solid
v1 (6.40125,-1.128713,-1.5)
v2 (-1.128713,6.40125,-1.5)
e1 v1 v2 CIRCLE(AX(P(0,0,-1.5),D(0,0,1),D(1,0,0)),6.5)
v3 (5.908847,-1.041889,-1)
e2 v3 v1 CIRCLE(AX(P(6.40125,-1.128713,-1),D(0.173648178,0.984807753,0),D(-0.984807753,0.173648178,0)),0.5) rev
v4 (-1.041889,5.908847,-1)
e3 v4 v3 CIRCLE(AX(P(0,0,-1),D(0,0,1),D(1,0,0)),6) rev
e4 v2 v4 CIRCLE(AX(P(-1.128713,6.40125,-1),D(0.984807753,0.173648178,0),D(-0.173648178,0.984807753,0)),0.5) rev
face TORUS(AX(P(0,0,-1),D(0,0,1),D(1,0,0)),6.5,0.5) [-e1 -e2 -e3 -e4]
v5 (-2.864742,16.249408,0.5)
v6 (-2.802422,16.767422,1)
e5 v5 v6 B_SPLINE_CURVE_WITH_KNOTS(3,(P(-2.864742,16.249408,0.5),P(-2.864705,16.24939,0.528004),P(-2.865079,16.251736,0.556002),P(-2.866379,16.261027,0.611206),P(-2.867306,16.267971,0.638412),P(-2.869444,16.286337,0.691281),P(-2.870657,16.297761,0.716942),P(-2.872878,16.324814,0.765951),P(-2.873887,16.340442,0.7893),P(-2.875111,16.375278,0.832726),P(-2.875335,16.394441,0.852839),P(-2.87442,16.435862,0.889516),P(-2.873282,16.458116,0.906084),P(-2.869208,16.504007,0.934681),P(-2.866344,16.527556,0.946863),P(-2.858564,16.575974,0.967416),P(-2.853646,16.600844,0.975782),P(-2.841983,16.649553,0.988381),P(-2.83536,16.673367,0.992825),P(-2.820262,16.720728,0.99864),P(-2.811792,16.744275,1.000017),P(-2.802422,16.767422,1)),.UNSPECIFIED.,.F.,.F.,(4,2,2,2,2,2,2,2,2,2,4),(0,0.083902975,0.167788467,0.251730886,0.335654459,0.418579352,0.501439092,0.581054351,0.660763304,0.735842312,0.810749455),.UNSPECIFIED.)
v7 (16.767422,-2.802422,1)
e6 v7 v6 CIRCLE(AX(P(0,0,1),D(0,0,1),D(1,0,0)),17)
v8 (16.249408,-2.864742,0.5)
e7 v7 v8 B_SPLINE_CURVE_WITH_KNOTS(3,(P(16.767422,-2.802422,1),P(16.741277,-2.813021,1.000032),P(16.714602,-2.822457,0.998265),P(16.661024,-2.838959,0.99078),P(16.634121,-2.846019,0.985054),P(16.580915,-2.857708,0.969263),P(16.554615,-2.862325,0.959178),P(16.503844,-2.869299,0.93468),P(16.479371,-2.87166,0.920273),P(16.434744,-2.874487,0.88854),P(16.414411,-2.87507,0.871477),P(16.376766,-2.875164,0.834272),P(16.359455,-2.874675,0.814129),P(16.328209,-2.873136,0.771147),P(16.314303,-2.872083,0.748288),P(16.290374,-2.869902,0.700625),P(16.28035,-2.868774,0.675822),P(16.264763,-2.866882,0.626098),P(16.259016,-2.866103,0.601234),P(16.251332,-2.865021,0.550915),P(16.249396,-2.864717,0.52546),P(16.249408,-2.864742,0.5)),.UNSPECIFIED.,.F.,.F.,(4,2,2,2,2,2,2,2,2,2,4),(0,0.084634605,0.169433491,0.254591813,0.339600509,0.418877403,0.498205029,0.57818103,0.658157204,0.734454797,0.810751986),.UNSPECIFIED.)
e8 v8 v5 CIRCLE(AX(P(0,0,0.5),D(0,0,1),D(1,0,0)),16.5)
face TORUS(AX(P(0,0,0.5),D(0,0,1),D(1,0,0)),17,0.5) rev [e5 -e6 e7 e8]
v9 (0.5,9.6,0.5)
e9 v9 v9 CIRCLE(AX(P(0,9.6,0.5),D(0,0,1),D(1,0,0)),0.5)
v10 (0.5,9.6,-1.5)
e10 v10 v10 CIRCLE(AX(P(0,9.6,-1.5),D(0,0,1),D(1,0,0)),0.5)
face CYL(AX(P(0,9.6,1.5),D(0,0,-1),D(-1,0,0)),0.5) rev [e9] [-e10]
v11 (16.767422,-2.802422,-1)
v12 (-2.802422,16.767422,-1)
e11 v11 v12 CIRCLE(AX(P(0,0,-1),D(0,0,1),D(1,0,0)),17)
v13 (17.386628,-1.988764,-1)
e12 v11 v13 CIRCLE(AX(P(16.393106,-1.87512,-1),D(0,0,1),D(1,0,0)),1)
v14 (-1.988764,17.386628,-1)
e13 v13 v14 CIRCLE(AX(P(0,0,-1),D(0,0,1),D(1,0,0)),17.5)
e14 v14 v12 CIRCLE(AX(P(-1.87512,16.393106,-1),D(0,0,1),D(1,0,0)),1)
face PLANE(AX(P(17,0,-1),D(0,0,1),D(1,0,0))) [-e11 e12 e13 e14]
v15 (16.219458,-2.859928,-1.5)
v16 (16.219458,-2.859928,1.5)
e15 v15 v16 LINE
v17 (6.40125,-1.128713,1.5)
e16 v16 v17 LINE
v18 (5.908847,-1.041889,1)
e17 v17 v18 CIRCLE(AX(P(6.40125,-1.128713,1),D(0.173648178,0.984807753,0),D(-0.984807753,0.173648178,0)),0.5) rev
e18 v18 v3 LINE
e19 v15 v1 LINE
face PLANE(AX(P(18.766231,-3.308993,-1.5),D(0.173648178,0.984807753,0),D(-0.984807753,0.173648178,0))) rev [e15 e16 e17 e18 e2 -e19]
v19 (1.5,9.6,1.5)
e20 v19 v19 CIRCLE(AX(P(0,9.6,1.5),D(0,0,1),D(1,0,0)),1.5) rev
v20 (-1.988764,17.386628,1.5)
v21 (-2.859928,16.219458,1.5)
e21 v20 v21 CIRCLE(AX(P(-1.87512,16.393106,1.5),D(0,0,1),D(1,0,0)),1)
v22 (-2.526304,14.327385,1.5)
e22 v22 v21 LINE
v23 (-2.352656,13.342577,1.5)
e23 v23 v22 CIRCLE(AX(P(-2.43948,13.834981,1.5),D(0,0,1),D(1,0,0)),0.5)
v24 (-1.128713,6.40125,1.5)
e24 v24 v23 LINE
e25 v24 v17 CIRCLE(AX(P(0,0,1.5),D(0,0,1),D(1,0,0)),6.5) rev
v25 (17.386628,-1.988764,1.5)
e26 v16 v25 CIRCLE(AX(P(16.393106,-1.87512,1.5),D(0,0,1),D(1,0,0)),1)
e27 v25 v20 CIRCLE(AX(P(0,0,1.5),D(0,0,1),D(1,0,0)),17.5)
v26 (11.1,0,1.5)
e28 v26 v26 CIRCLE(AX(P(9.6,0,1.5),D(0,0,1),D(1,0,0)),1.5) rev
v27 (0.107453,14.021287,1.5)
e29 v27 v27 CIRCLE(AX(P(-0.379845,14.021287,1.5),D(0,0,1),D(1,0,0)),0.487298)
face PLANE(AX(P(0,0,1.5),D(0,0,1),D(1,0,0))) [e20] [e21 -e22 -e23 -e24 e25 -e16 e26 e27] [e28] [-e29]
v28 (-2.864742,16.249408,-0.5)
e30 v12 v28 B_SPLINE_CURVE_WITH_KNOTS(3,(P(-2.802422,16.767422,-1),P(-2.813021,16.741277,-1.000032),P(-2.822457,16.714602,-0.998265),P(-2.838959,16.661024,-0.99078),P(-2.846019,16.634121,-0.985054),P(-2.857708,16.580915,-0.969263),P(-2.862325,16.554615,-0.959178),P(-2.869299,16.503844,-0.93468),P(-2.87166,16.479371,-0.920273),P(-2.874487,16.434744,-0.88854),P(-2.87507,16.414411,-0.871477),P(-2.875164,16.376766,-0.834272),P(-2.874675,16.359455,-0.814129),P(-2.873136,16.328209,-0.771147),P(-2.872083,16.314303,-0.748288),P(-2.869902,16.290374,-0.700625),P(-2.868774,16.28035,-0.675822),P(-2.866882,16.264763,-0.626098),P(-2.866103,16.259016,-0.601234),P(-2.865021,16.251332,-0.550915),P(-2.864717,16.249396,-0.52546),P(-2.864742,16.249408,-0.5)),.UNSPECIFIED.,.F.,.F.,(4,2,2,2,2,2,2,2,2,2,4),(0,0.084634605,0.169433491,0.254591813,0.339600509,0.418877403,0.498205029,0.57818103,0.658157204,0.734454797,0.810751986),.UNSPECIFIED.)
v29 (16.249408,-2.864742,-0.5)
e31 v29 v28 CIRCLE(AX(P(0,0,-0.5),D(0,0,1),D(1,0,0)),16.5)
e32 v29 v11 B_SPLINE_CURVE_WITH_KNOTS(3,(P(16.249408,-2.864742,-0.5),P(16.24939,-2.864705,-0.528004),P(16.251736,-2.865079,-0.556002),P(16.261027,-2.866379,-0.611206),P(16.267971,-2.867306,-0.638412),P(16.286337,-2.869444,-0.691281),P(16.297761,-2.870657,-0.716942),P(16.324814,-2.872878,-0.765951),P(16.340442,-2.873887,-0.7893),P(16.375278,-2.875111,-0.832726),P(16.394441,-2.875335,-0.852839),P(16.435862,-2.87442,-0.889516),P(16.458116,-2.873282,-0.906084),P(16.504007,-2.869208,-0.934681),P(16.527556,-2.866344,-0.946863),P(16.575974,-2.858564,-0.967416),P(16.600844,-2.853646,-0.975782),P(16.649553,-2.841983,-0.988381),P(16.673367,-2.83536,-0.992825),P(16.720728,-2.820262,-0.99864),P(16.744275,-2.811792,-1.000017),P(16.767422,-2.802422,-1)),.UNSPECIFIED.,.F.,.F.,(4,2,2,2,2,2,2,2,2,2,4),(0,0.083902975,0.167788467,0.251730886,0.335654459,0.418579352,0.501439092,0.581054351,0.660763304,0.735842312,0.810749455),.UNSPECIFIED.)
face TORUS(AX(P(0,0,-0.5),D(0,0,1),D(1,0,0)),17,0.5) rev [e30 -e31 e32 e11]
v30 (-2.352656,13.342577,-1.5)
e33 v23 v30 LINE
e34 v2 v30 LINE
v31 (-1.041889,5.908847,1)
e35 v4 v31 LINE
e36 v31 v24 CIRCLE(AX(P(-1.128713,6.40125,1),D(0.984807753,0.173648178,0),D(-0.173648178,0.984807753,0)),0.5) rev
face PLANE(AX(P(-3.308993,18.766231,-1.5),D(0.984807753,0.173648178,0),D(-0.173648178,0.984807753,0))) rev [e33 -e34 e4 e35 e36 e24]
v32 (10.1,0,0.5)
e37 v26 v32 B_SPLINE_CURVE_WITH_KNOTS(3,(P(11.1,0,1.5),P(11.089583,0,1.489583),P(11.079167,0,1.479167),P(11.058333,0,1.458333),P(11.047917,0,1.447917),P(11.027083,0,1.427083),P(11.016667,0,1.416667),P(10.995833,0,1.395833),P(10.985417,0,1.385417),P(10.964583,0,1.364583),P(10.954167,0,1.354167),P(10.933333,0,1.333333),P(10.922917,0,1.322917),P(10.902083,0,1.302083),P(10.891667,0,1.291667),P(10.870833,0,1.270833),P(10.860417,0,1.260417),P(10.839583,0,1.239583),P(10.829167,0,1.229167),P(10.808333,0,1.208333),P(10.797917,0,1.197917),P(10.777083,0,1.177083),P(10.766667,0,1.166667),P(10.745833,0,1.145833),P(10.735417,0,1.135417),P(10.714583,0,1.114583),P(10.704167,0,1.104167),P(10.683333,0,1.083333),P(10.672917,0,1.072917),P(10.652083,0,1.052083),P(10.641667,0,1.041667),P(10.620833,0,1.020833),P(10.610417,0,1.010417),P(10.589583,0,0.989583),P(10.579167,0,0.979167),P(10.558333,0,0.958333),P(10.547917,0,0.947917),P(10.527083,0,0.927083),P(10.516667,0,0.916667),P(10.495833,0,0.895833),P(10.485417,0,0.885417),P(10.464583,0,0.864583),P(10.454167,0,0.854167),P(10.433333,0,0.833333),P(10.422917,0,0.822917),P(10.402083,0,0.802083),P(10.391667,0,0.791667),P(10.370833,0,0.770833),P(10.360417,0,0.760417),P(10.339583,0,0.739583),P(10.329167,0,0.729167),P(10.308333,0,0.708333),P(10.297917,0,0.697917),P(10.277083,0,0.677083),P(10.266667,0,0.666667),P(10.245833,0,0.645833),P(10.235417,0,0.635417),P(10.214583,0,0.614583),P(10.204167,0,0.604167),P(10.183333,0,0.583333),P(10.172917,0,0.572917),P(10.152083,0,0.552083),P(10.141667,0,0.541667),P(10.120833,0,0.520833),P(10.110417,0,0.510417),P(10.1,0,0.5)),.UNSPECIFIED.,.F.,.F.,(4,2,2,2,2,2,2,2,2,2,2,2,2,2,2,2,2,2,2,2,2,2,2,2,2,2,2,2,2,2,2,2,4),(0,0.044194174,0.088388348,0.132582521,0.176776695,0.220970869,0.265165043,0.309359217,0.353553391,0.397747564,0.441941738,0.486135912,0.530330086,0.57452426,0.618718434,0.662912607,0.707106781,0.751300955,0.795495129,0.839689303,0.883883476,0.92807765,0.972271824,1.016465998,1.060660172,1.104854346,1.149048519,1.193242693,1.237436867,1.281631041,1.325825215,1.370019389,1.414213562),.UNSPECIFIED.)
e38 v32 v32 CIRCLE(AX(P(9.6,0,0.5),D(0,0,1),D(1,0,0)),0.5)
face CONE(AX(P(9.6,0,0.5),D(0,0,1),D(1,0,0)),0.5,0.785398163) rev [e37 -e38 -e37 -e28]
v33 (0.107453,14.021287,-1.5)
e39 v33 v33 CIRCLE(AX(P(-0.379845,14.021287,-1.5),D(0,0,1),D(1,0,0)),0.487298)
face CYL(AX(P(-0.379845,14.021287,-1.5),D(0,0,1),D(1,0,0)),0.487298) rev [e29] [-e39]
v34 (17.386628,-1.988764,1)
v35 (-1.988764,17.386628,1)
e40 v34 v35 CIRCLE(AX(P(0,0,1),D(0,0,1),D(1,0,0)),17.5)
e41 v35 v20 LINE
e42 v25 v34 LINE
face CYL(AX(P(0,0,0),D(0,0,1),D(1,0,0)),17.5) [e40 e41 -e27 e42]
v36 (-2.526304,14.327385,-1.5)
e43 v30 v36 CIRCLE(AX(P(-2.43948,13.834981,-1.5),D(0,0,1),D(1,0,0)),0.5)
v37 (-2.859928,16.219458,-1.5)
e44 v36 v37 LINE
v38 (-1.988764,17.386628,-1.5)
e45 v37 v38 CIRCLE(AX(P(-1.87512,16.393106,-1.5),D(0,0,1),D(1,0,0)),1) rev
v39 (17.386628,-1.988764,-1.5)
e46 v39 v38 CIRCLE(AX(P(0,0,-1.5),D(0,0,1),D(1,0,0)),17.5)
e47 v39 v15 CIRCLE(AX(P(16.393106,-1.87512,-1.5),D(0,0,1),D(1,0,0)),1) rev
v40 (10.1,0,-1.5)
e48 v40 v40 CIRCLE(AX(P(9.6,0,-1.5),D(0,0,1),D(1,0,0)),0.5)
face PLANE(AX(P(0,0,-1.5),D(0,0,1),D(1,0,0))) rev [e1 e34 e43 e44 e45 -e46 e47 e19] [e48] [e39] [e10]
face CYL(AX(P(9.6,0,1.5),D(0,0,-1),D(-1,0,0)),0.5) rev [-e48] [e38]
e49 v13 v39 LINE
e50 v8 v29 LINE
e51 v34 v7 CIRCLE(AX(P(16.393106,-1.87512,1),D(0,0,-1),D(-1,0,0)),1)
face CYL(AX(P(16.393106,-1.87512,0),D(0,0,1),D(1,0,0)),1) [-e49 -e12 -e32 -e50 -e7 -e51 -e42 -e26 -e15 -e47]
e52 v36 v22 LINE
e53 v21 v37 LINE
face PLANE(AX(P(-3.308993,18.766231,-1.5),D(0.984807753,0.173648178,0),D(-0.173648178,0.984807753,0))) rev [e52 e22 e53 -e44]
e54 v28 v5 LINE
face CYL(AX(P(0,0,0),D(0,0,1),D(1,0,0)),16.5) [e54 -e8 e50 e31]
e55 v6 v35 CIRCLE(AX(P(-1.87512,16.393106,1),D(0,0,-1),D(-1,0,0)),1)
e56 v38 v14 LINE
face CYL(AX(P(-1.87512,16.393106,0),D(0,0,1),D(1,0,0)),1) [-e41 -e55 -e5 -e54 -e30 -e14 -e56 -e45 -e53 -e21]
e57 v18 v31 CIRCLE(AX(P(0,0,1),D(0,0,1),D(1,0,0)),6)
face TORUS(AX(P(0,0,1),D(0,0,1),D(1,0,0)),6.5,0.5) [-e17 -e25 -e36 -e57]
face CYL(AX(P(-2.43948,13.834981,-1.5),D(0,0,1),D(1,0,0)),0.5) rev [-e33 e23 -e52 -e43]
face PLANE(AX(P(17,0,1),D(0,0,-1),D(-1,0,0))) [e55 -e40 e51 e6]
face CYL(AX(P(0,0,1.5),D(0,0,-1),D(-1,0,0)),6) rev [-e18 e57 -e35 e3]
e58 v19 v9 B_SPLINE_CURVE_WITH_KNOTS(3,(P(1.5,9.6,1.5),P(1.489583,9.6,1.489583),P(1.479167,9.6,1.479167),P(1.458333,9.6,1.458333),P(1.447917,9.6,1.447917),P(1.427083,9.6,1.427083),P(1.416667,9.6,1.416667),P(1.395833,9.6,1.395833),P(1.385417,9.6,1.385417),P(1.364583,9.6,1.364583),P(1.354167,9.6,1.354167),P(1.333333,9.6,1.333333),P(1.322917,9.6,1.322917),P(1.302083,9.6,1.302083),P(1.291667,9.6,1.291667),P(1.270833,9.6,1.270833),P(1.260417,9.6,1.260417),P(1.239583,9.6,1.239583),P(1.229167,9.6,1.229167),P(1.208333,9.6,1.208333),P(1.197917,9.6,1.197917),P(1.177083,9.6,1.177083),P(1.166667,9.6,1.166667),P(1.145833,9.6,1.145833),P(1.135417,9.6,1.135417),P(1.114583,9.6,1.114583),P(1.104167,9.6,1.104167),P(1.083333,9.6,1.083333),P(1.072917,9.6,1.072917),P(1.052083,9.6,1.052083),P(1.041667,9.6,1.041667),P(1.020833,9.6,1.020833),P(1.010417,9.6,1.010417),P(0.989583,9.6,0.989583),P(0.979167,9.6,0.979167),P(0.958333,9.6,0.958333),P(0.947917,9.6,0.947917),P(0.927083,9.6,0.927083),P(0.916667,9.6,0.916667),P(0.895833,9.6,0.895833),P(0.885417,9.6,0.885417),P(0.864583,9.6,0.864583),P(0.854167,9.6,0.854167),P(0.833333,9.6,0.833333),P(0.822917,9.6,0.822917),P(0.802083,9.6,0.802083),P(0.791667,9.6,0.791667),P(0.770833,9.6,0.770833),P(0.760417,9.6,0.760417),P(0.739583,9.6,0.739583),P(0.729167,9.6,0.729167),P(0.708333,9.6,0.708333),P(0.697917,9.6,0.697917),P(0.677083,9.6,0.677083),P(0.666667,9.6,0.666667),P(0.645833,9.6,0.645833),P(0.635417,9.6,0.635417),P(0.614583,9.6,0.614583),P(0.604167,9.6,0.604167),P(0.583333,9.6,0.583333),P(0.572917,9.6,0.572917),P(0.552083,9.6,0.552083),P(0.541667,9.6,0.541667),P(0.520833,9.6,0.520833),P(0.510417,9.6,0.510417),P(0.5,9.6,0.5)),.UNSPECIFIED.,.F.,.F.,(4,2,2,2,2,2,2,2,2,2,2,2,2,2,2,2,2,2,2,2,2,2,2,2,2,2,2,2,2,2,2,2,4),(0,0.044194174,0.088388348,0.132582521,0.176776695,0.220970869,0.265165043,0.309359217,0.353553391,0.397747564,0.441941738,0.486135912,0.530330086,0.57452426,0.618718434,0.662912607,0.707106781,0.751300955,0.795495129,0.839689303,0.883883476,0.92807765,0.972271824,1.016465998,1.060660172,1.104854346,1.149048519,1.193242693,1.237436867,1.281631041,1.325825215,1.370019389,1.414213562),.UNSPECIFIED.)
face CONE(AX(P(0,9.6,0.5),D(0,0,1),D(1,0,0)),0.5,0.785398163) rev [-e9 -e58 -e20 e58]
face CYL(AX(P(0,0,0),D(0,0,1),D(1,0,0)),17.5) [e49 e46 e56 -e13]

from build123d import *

# Parameters (mm, degrees)
SKETCH1_R               = 17
SKETCH1_R_2             = 0.49999999999999895
SKETCH1_R_3             = 6
SKETCH1_R_4             = 0.4999999999999985
SKETCH1_R_5             = 0.49999999999999967
SKETCH1_R_6             = 0.5000000000000008
BOSS_EXTRUDE1_DEPTH     = 1.5
SKETCH7_W               = 0.5
SKETCH7_H               = 0.5
CUT_EXTRUDE1_DEPTH      = 25.794152536434876
CUT_EXTRUDE1_DEPTH_BACK = 25.794152536434876
CUT_EXTRUDE2_DEPTH      = 25.92990172463582
CUT_EXTRUDE2_DEPTH_BACK = 25.92990172463582
SKETCH5_R               = 0.5000000000000009
SKETCH5_R_2             = 0.48729793970449836
FILLET1_R               = 0.5
CHAMFER1_SIZE           = 1
FILLET2_R               = 1


with BuildPart() as part:
    # Sketch1 → Boss-Extrude1 (new, symmetric)
    with BuildSketch(Plane.XY):
        Circle(SKETCH1_R)
        with Locations((9.600000000000001, 0)):
            Circle(SKETCH1_R_2, mode=Mode.SUBTRACT)
        Circle(SKETCH1_R_3, mode=Mode.SUBTRACT)
        with Locations((-3.352e-14, -9.600000000000001)):
            Circle(SKETCH1_R_4, mode=Mode.SUBTRACT)
        with Locations((-9.600000000000001, 6.704e-14)):
            Circle(SKETCH1_R_5, mode=Mode.SUBTRACT)
        with Locations((1.0055e-13, 9.600000000000001)):
            Circle(SKETCH1_R_6, mode=Mode.SUBTRACT)
    extrude(amount=BOSS_EXTRUDE1_DEPTH, both=True)

    # Sketch2 → Cut-Revolve1 (revolve, cut)
    with BuildSketch(Plane(origin=(0, 0, 0), x_dir=(1, 0, 0), z_dir=(0, 1, 0)), mode=Mode.PRIVATE) as cut_revolve1_sk:
        with BuildLine():
            Line((-16.5, -0.49999999999999956), (-16.5, 0.49999999999999956))
            ThreePointArc((-16.5, 0.49999999999999956), (-16.646446609406727, 0.8535533905932733), (-17, 1))
            Line((-17, 1), (-17, -1))
            ThreePointArc((-17, -1), (-16.646446609406727, -0.8535533905932733), (-16.5, -0.49999999999999956))
        make_face()
    revolve(cut_revolve1_sk.sketch.rotate(Axis((0, 0, 0), (0, 0, -1)), 180), axis=Axis((0, 0, 0), (0, 0, -1)), mode=Mode.SUBTRACT)

    # Sketch7 → Revolve1 (revolve)
    with BuildSketch(Plane(origin=(0, 0, 0), x_dir=(1, 0, 0), z_dir=(0, 1, 0))):
        with Locations((17.25, 1.25)):
            Rectangle(SKETCH7_W, SKETCH7_H)
        with Locations((17.25, -1.25)):
            Rectangle(SKETCH7_W, SKETCH7_H)
    revolve(axis=Axis((0, 0, 0), (0, 0, -1)))

    # Sketch4 → Cut-Extrude1 (cut, two sides: drawn at the far end of the back side and taken through both)
    with BuildSketch(Plane.XY.offset(-CUT_EXTRUDE1_DEPTH_BACK)):
        Polygon((-3.3089929101566358, 18.76623133261556), (0, 0), (18.766231332615533, -3.308992910156828), (18.766231332615533, -21.784688156780618), (-24.932091474912426, -21.784688156780618), (-24.93209147491243, 18.76623133261556), align=None)
    extrude(amount=CUT_EXTRUDE1_DEPTH + CUT_EXTRUDE1_DEPTH_BACK, mode=Mode.SUBTRACT)

    # Sketch5 → Cut-Extrude2 (cut, two sides: drawn at the far end of the back side and taken through both)
    with BuildSketch(Plane.XY.offset(1.5).offset(-CUT_EXTRUDE2_DEPTH_BACK)):
        with Locations((-2.439480379102094, 13.834980723316052)):
            Circle(SKETCH5_R)
        with Locations((-0.37984462011943565, 14.021287153916445)):
            Circle(SKETCH5_R_2)
    extrude(amount=CUT_EXTRUDE2_DEPTH + CUT_EXTRUDE2_DEPTH_BACK, mode=Mode.SUBTRACT)

    # Fillet1
    fillet1_edges = [part.edges().sort_by_distance(p)[0] for p in [
        (4.242640687119308, 4.242640687119264, 1.5),
        (4.242640687119308, 4.242640687119264, -1.5),
    ]]
    fillet(fillet1_edges, radius=FILLET1_R)

    # Chamfer1
    chamfer1_edges = [part.edges().sort_by_distance(p)[0] for p in [
        (9.100000000000003, 6e-17, 1.5),
        (-0.49999999999990025, 9.600000000000001, 1.5),
    ]]
    chamfer(chamfer1_edges, length=CHAMFER1_SIZE)

    # Fillet2
    fillet2_edges = [part.edges().sort_by_distance(p)[0] for p in [
        (17.23413567771362, -3.0388431091714043, 1.25),
        (-3.0388431091712285, 17.23413567771365, -1.25),
    ]]
    fillet(fillet2_edges, radius=FILLET2_R - 0.0001)  # a hair under: the kernel refuses the full size


solid = part.part
